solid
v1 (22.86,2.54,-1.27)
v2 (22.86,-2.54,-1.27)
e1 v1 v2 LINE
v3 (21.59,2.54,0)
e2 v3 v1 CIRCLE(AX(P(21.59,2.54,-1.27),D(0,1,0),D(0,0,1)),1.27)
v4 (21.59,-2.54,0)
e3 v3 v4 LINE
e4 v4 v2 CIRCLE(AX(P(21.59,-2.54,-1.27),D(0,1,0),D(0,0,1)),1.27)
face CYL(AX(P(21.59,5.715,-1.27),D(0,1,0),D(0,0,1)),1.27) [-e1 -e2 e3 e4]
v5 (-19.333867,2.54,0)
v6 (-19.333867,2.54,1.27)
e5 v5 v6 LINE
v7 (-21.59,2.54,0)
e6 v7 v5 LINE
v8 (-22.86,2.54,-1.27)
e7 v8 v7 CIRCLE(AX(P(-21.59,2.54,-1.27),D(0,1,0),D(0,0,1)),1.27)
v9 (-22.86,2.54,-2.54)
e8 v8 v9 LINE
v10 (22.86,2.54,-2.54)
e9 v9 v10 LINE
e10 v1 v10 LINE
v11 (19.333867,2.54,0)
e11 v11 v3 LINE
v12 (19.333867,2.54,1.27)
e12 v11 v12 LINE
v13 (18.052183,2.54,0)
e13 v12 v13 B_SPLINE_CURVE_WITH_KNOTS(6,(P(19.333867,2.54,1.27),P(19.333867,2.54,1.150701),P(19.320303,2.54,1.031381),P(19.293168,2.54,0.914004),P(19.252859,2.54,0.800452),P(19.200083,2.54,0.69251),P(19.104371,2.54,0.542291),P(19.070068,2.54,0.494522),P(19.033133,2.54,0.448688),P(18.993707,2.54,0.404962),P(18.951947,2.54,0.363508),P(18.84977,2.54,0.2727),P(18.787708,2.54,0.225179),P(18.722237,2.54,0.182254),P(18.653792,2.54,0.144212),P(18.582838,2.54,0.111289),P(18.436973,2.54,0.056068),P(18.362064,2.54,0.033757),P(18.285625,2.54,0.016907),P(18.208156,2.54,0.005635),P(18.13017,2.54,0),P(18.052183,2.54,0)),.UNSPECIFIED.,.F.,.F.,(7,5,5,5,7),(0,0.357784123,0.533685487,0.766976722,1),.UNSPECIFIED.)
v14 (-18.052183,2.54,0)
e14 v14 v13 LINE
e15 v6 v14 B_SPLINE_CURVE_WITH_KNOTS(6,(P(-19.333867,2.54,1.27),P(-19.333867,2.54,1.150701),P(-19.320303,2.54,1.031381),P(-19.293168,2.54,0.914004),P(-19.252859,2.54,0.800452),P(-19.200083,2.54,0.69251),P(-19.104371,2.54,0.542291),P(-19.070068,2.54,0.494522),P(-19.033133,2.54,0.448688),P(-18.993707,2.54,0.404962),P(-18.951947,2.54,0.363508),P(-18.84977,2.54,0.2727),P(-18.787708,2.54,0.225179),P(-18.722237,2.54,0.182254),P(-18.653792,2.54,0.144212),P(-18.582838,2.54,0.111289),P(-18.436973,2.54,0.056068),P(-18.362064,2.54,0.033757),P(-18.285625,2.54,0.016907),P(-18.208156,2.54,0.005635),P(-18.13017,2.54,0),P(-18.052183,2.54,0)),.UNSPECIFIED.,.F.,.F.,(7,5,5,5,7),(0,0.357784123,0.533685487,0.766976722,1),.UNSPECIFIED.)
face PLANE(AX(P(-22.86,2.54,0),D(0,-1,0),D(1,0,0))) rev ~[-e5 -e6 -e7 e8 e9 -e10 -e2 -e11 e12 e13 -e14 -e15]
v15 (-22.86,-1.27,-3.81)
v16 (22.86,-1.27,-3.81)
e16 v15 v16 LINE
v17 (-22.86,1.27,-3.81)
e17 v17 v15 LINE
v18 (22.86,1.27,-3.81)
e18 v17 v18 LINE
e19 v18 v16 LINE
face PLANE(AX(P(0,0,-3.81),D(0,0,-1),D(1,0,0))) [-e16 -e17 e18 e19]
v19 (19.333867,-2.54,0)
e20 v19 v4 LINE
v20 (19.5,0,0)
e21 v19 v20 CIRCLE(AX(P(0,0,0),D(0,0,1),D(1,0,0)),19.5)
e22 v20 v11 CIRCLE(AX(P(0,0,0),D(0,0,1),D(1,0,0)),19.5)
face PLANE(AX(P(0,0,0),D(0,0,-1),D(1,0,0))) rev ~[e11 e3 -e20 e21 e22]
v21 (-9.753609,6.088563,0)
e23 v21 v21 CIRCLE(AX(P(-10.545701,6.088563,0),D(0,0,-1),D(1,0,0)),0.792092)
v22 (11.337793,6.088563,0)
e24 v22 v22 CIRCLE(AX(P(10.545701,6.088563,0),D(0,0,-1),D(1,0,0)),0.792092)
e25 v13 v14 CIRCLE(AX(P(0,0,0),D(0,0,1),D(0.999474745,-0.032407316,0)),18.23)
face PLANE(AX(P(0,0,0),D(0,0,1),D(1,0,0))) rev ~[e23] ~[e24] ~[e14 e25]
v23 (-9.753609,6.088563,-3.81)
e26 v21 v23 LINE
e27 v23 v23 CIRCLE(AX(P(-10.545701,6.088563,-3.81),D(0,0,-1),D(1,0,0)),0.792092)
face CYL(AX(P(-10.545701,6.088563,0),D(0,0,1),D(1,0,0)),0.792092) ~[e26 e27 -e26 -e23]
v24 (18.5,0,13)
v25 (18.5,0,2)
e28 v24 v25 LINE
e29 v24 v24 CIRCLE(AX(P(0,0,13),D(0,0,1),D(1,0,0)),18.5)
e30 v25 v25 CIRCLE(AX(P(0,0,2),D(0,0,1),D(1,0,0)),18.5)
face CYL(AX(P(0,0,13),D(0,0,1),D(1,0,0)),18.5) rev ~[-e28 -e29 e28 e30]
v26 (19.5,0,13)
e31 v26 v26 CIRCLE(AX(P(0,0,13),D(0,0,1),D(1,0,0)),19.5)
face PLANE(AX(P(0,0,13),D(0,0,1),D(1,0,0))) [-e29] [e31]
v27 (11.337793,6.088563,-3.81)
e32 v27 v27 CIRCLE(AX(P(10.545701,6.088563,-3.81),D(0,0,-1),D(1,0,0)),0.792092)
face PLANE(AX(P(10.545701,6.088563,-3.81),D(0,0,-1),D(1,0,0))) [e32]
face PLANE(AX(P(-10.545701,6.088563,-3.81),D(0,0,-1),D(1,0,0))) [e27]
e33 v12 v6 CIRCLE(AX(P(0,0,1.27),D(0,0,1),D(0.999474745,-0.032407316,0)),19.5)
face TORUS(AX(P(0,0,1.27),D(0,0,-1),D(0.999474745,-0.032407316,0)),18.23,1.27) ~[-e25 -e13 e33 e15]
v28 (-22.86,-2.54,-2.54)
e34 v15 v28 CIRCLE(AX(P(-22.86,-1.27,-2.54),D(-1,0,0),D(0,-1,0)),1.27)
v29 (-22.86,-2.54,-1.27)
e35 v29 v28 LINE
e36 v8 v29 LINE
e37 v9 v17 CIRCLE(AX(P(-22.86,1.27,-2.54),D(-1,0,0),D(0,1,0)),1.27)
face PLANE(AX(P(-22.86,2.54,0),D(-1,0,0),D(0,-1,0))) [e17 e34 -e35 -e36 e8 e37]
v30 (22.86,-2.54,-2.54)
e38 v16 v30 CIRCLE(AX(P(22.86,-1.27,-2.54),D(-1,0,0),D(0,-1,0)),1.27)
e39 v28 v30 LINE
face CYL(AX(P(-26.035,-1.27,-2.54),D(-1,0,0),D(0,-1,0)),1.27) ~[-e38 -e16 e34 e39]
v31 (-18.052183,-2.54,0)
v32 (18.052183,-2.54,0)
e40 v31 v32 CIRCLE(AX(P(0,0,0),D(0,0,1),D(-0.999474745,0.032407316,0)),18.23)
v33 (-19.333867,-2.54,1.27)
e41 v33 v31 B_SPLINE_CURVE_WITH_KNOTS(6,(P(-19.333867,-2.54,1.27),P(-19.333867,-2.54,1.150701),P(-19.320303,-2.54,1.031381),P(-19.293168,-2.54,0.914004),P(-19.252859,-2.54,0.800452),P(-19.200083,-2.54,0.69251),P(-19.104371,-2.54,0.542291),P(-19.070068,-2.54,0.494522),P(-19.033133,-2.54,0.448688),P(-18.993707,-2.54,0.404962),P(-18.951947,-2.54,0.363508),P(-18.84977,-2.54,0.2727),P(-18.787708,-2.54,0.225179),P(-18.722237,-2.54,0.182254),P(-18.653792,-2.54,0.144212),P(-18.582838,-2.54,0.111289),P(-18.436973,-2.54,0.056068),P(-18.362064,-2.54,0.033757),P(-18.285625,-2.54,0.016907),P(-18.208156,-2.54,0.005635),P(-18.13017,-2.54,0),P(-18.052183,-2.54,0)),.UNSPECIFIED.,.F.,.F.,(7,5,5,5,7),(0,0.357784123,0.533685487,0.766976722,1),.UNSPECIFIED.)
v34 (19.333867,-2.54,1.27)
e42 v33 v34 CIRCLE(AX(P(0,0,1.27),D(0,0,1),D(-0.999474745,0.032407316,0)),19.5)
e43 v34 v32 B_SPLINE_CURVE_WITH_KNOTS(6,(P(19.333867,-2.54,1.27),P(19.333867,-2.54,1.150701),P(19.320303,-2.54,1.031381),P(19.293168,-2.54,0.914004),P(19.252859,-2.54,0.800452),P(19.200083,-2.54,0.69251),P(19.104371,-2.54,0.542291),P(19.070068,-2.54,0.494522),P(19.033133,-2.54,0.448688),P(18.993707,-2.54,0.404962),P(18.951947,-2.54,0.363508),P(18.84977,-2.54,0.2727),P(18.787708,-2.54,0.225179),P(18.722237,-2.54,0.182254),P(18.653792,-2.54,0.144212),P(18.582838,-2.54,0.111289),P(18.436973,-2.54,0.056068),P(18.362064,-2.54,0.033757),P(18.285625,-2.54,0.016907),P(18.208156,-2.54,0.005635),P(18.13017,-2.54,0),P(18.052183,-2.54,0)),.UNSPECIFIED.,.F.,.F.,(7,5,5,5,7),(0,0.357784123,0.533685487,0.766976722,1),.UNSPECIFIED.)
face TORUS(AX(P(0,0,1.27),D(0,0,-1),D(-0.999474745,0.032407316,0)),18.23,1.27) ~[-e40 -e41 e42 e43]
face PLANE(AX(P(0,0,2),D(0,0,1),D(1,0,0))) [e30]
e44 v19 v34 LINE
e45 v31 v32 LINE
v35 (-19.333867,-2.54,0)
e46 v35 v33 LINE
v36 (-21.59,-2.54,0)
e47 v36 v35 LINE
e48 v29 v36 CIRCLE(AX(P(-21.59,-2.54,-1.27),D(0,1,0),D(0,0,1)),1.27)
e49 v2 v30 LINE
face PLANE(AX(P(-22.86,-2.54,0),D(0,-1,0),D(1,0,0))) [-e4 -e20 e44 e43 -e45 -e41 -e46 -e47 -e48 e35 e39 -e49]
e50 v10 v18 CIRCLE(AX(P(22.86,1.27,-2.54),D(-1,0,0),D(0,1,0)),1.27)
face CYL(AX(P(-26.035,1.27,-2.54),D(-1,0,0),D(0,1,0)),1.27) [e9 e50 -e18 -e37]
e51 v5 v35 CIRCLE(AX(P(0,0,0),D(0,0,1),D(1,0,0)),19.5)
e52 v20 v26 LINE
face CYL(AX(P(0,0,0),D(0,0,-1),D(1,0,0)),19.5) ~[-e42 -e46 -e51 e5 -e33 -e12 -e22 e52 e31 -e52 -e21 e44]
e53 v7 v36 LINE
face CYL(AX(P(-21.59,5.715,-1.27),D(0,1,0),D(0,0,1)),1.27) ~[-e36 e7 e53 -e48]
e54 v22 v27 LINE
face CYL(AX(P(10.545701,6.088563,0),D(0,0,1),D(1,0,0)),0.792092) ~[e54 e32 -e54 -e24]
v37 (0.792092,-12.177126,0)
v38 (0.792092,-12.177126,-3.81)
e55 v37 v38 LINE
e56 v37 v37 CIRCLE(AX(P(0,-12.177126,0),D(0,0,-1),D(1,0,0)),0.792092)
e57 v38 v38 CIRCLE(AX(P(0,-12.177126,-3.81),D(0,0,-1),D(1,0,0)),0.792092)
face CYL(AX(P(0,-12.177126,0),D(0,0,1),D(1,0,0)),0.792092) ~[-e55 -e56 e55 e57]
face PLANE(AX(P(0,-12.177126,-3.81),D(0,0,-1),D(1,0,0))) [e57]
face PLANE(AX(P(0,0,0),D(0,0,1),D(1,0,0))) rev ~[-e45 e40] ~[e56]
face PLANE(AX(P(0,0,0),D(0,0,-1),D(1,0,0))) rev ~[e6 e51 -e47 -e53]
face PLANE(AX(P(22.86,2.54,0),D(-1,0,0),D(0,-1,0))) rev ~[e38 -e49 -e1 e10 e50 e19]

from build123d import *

# Parameters (mm, degrees)
F0_R         = 19.5
F1_DEPTH     = 13
F2_R         = 18.5
F3_DEPTH     = 11
F4_W         = 45.72
F4_H         = 5.08
F5_DEPTH     = 3.81
F6_T1_DEPTH  = 52.07
F6_T3_DEPTH  = 11.43
F6_T8_ANGLE  = 183.7142551891
F6_T13_ANGLE = 183.7142551891
F7_R         = 0.7920917612
F8_DEPTH     = 3.81


# Not quite as in the source:
# - a fillet or chamfer that OpenCascade refuses, or shapes differently, is made with other operations: its cross-section is extruded or revolved along the edge and cut away or added


with BuildPart() as f1:
    # F0 (on Top) → F1 (new body)
    with BuildSketch(Plane.XY):
        Circle(F0_R)
    extrude(amount=F1_DEPTH)

    # F2 (on face) → F3 (cut)
    with BuildSketch(Plane.XY.offset(13)):
        Circle(F2_R)
    extrude(amount=-F3_DEPTH, mode=Mode.SUBTRACT)

    # F4 (on face) → F5 (join)
    with BuildSketch(Plane(origin=(0, 0, 0), x_dir=(1, 0, 0), z_dir=(0, 0, -1))):
        Rectangle(F4_W, F4_H)
    extrude(amount=F5_DEPTH)

    # F6: fillet of radius 1.27 on 6 edges, made by hand

    # F6_s2 → F6_t1 (cut)
    with BuildSketch(Plane.YZ.offset(-26.035)):
        with BuildLine():
            ThreePointArc((-2.54, -2.54), (-2.1680256121, -3.4380256121), (-1.27, -3.81))
            Line((-1.27, -3.81), (-2.54, -3.81))
            Line((-2.54, -3.81), (-2.54, -2.54))
        make_face()
        with BuildLine():
            ThreePointArc((2.54, -2.54), (2.1680256121, -3.4380256121), (1.27, -3.81))
            Line((1.27, -3.81), (2.54, -3.81))
            Line((2.54, -3.81), (2.54, -2.54))
        make_face()
    extrude(amount=F6_T1_DEPTH, mode=Mode.SUBTRACT)

    # F6_s4 → F6_t3 (cut)
    with BuildSketch(Plane.XZ.offset(-5.715)):
        with BuildLine():
            ThreePointArc((-21.59, 0), (-22.4880256121, -0.3719743879), (-22.86, -1.27))
            Line((-22.86, -1.27), (-22.86, 0))
            Line((-22.86, 0), (-21.59, 0))
        make_face()
        with BuildLine():
            ThreePointArc((21.59, 0), (22.4880256121, -0.3719743879), (22.86, -1.27))
            Line((22.86, -1.27), (22.86, 0))
            Line((22.86, 0), (21.59, 0))
        make_face()
    extrude(amount=F6_T3_DEPTH, mode=Mode.SUBTRACT)


with BuildPart() as f6_tool6:
    # F6_s7 → F6_t8 (revolve)
    with BuildSketch(Plane(origin=(0, 0, 0), x_dir=(0, 0, 1), z_dir=(-0.0324073159, -0.999474745, 0))):
        with BuildLine():
            ThreePointArc((1.27, -19.5), (0.3719743879, -19.1280256121), (0, -18.23))
            Line((0, -18.23), (0, -19.5))
            Line((0, -19.5), (1.27, -19.5))
        make_face()
    revolve(axis=Axis((0, 0, 0), (0, 0, 1)), revolution_arc=F6_T8_ANGLE)

    split(bisect_by=Plane.XZ.offset(-2.54), keep=Keep.BOTTOM)


with BuildPart() as f1_1:
    add(f1.part)

    # F6_t5: cut F6_tool6
    add(f6_tool6.part, mode=Mode.SUBTRACT)


with BuildPart() as f6_tool11:
    # F6_s12 → F6_t13 (revolve)
    with BuildSketch(Plane(origin=(0, 0, 0), x_dir=(0, 0, 1), z_dir=(0.0324073159, 0.999474745, 0))):
        with BuildLine():
            ThreePointArc((1.27, -19.5), (0.3719743879, -19.1280256121), (0, -18.23))
            Line((0, -18.23), (0, -19.5))
            Line((0, -19.5), (1.27, -19.5))
        make_face()
    revolve(axis=Axis((0, 0, 0), (0, 0, 1)), revolution_arc=F6_T13_ANGLE)

    split(bisect_by=Plane.XZ.offset(2.54), keep=Keep.TOP)


with BuildPart() as f1_2:
    add(f1_1.part)

    # F6_t10: cut F6_tool11
    add(f6_tool11.part, mode=Mode.SUBTRACT)

    # F7 (on face) → F8 (join, through all)
    with BuildSketch(Plane(origin=(0, 0, 0), x_dir=(1, 0, 0), z_dir=(0, 0, -1))):
        with Locations((10.5457008786, -6.0885632411)):
            Circle(F7_R)
        with Locations((-10.5457008786, -6.0885632411)):
            Circle(F7_R)
        with Locations((0, 12.1771264821)):
            Circle(F7_R)
    extrude(amount=F8_DEPTH)


solid = f1_2.part
